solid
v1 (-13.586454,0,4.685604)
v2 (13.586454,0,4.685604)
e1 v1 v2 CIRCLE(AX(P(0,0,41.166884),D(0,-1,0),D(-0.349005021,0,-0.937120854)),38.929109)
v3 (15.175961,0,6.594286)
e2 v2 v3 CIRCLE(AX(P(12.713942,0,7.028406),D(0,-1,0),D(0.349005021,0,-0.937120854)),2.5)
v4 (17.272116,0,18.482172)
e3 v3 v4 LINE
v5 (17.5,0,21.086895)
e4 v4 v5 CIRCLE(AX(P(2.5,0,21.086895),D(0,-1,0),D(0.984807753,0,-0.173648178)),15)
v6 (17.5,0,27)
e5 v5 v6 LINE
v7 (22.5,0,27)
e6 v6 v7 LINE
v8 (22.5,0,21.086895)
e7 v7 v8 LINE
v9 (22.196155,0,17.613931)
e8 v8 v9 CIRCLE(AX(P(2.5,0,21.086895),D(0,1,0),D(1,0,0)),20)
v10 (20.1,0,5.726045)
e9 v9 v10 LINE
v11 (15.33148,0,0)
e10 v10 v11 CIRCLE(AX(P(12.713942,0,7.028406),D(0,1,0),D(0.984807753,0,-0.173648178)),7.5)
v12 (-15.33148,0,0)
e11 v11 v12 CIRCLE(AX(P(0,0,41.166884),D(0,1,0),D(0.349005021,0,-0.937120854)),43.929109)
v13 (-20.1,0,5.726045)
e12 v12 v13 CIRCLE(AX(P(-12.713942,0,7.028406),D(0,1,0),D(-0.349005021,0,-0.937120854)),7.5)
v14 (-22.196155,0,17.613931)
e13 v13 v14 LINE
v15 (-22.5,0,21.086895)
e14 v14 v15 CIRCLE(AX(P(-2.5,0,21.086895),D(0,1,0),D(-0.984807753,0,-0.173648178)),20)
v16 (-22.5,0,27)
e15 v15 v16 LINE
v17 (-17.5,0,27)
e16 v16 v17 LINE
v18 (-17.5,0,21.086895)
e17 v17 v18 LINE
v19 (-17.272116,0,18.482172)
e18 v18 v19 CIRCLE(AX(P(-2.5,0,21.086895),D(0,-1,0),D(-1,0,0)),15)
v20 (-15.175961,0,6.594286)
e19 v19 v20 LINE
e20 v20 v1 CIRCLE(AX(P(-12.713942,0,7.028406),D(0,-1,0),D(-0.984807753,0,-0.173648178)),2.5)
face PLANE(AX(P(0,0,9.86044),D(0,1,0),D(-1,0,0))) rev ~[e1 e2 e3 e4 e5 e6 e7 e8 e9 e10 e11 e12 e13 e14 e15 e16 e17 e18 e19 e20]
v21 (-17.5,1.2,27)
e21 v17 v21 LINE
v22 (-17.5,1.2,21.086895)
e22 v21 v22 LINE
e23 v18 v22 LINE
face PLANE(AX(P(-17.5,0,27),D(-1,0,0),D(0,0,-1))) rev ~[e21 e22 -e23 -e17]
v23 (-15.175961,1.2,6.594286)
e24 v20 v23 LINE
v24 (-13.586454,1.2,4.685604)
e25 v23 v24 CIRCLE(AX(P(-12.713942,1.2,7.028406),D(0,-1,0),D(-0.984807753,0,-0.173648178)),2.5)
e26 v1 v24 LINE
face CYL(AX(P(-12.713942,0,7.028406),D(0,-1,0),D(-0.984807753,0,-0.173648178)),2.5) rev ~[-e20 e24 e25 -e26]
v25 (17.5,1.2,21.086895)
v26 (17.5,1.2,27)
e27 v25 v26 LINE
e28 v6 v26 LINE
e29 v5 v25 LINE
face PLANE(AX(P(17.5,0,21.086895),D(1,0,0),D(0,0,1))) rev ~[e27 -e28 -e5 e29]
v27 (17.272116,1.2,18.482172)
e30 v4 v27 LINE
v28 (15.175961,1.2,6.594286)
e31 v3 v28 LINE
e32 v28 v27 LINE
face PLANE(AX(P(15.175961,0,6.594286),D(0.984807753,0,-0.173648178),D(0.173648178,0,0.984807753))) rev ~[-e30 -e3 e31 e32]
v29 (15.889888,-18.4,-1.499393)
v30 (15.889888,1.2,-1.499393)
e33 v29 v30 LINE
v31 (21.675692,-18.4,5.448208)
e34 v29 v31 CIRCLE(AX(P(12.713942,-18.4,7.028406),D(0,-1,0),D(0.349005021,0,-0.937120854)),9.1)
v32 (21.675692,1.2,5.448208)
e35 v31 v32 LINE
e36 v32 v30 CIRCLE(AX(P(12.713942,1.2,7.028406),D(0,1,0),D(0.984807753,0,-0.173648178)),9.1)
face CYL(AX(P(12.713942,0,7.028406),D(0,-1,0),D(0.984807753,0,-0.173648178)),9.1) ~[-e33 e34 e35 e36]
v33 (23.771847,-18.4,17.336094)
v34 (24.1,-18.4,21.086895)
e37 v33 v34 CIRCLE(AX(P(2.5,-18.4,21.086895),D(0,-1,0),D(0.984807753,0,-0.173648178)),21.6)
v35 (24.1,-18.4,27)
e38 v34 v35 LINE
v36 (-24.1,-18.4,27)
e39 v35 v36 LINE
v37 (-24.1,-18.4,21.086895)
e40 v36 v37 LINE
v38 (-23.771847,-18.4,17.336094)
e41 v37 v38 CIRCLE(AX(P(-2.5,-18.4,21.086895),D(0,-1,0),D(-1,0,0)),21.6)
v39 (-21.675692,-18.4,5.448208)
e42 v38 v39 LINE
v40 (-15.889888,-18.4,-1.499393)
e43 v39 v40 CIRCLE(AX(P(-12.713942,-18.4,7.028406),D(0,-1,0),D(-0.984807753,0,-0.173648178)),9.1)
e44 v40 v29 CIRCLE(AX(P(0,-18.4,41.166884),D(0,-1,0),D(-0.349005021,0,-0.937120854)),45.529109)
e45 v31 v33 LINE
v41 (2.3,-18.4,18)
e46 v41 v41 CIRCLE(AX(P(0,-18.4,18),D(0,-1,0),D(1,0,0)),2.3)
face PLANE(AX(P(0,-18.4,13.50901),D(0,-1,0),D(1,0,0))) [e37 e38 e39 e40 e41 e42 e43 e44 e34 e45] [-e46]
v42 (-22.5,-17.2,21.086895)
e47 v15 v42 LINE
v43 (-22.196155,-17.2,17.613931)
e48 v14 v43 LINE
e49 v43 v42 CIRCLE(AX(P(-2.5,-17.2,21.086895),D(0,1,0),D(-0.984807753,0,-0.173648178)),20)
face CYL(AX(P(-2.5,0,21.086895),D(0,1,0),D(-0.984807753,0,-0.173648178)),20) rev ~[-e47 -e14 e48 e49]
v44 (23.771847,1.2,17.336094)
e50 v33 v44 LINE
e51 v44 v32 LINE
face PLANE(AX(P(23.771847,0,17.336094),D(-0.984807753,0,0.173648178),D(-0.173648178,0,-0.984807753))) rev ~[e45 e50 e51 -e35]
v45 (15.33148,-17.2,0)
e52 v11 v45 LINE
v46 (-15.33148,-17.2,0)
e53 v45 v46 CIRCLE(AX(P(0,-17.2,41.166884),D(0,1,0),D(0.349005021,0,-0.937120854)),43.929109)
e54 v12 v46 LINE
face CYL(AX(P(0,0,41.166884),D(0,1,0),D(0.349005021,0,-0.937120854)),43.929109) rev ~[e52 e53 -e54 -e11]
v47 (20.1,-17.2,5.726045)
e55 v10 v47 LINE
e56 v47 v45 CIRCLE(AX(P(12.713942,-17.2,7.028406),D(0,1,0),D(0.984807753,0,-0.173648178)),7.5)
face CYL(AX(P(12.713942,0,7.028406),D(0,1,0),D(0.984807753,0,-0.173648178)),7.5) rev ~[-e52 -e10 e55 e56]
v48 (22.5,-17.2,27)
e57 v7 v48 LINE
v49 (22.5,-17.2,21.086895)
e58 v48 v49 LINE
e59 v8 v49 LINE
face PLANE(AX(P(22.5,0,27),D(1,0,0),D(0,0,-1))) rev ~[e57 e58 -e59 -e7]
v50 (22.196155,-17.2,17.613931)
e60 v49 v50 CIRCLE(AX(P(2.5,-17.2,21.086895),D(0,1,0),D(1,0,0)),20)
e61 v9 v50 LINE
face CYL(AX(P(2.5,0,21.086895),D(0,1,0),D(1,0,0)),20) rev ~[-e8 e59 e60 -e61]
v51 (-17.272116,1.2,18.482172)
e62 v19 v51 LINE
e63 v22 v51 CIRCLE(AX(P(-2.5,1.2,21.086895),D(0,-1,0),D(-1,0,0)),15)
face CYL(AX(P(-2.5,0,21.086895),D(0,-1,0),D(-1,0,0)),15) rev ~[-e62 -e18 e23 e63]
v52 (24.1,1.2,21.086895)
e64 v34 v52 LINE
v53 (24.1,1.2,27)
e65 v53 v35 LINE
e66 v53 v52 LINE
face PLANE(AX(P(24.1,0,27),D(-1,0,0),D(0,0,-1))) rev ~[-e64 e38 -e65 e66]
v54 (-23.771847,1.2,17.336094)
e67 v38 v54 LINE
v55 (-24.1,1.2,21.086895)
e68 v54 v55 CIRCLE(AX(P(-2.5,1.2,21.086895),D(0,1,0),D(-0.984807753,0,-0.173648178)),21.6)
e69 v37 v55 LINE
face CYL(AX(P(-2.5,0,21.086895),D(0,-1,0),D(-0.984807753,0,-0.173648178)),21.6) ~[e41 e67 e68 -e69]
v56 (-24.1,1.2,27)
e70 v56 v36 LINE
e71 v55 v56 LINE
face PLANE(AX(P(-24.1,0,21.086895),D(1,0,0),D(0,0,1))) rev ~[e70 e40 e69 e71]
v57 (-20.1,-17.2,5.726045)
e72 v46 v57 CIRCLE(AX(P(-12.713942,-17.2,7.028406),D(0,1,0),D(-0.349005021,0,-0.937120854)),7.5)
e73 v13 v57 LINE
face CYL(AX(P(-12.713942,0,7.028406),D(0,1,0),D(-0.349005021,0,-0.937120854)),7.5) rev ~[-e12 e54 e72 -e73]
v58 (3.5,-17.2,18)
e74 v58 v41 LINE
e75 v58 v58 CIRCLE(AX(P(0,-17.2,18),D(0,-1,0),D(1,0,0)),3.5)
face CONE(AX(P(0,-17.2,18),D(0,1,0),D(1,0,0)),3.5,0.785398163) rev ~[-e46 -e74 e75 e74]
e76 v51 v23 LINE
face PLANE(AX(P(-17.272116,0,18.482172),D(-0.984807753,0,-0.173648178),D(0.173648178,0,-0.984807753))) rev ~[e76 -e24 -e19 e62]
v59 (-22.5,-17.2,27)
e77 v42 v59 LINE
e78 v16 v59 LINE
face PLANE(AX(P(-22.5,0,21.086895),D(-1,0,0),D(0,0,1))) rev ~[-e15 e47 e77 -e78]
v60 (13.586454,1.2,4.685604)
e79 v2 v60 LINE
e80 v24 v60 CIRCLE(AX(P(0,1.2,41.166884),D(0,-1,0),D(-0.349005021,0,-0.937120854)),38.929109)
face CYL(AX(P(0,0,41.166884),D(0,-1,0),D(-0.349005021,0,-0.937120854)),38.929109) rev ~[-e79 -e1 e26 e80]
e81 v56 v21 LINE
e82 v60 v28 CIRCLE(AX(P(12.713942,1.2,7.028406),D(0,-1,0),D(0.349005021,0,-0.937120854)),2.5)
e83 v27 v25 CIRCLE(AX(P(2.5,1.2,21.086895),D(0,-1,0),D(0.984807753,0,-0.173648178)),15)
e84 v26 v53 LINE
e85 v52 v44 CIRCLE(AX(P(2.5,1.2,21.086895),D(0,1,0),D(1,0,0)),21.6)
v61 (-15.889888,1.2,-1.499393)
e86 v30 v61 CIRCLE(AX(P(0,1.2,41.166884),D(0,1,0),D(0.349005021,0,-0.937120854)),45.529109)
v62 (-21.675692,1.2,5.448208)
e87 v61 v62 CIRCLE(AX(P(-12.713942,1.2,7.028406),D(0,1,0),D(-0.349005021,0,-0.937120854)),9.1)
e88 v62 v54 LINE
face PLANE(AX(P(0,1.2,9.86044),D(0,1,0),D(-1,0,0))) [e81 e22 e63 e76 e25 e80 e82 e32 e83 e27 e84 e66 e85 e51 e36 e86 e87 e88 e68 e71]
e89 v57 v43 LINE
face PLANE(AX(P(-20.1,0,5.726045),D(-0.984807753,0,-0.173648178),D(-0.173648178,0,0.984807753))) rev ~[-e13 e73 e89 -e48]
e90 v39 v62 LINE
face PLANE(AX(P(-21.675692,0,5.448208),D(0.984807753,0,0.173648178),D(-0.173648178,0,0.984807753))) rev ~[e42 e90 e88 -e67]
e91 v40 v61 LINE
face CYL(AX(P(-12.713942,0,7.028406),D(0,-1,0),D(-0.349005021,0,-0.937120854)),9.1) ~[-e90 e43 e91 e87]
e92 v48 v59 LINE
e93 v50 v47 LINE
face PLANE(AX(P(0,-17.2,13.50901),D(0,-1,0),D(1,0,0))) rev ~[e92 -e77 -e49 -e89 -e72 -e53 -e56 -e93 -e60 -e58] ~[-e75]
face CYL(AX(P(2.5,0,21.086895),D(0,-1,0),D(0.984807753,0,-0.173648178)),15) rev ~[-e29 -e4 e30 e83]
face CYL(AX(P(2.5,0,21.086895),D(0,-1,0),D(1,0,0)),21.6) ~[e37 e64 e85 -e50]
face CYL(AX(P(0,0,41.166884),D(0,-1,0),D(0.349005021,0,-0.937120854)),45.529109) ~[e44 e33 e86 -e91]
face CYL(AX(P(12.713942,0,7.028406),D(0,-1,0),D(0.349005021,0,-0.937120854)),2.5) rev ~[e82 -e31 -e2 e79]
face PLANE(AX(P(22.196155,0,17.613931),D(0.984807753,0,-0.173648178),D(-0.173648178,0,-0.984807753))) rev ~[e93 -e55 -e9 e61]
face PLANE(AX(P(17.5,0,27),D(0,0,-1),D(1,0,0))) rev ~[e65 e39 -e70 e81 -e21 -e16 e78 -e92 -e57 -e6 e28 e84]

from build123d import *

# Parameters (mm, degrees)
F1_DEPTH = 17.2
F2_R     = 1.5
F3_DEPTH = 1.2
F5_DEPTH = 1.2


# Not quite as in the source:
# - a fillet or chamfer that OpenCascade refuses, or shapes differently, is made with other operations: its cross-section is extruded or revolved along the edge and cut away or added


with BuildPart() as f1:
    # F0 (on Front) → F1 (new body)
    with BuildSketch(Plane.XZ):
        with BuildLine():
            Line((-20.1, 5.7260450742), (-22.1961550602, 17.6139311585))
            ThreePointArc((-22.1961550602, 17.6139311585), (-22.4238939618, 19.3437798569), (-22.5, 21.0868947118))
            Line((-22.5, 21.0868947118), (-22.5, 27))
            Line((-22.5, 27), (-24.1, 27))
            Line((-24.1, 27), (-24.1, 21.0868947118))
            ThreePointArc((-24.1, 21.0868947118), (-24.0178054788, 19.2043306685), (-23.7718474651, 17.3360940742))
            Line((-23.7718474651, 17.3360940742), (-21.6756924048, 5.44820799))
            ThreePointArc((-21.6756924048, 5.44820799), (-19.7066672631, 1.205023255), (-15.889887542, -1.4993933668))
            ThreePointArc((-15.889887542, -1.4993933668), (0, -4.3622248316), (15.889887542, -1.4993933668))
            ThreePointArc((15.889887542, -1.4993933668), (19.7066672631, 1.205023255), (21.6756924048, 5.44820799))
            Line((21.6756924048, 5.44820799), (23.7718474651, 17.3360940742))
            ThreePointArc((23.7718474651, 17.3360940742), (24.0178054788, 19.2043306685), (24.1, 21.0868947118))
            Line((24.1, 21.0868947118), (24.1, 27))
            Line((24.1, 27), (22.5, 27))
            Line((22.5, 27), (22.5, 21.0868947118))
            ThreePointArc((22.5, 21.0868947118), (22.4238939618, 19.3437798569), (22.1961550602, 17.6139311585))
            Line((22.1961550602, 17.6139311585), (20.1, 5.7260450742))
            ThreePointArc((20.1, 5.7260450742), (18.477177081, 2.2289147982), (15.3314795087, 0))
            ThreePointArc((15.3314795087, 0), (0, -2.7622248316), (-15.3314795087, 0))
            ThreePointArc((-15.3314795087, 0), (-18.477177081, 2.2289147982), (-20.1, 5.7260450742))
        make_face()
    extrude(amount=F1_DEPTH)

    # F2 (on face) → F3 (join)
    with BuildSketch(Plane.XZ.offset(17.2)):
        with BuildLine():
            Line((24.1, 27), (-24.1, 27))
            Line((-24.1, 27), (-24.1, 21.0868947118))
            ThreePointArc((-24.1, 21.0868947118), (-24.0178054788, 19.2043306685), (-23.7718474651, 17.3360940742))
            Line((-23.7718474651, 17.3360940742), (-21.6756924048, 5.44820799))
            ThreePointArc((-21.6756924048, 5.44820799), (-19.7066672631, 1.205023255), (-15.889887542, -1.4993933668))
            ThreePointArc((-15.889887542, -1.4993933668), (0, -4.3622248316), (15.889887542, -1.4993933668))
            ThreePointArc((15.889887542, -1.4993933668), (19.7066672631, 1.205023255), (21.6756924048, 5.44820799))
            Line((21.6756924048, 5.44820799), (23.7718474651, 17.3360940742))
            ThreePointArc((23.7718474651, 17.3360940742), (24.0178054788, 19.2043306685), (24.1, 21.0868947118))
            Line((24.1, 21.0868947118), (24.1, 27))
        make_face()
        with Locations((0, 18)):
            Circle(F2_R, mode=Mode.SUBTRACT)
    extrude(amount=F3_DEPTH)

    # F4 (on face) → F5 (join)
    with BuildSketch(Plane(origin=(0, 0, 0), x_dir=(-1, 0, 0), z_dir=(0, 1, 0))):
        with BuildLine():
            Line((-24.1, 27), (-24.1, 21.0868947118))
            ThreePointArc((-24.1, 21.0868947118), (-24.0178054788, 19.2043306685), (-23.7718474651, 17.3360940742))
            Line((-23.7718474651, 17.3360940742), (-21.6756924048, 5.44820799))
            ThreePointArc((-21.6756924048, 5.44820799), (-19.7066672631, 1.205023255), (-15.889887542, -1.4993933668))
            ThreePointArc((-15.889887542, -1.4993933668), (0, -4.3622248316), (15.889887542, -1.4993933668))
            ThreePointArc((15.889887542, -1.4993933668), (19.7066672631, 1.205023255), (21.6756924048, 5.44820799))
            Line((21.6756924048, 5.44820799), (23.7718474651, 17.3360940742))
            ThreePointArc((23.7718474651, 17.3360940742), (24.0178054788, 19.2043306685), (24.1, 21.0868947118))
            Line((24.1, 21.0868947118), (24.1, 27))
            Line((24.1, 27), (17.5, 27))
            Line((17.5, 27), (17.5, 21.0868947118))
            ThreePointArc((17.5, 21.0868947118), (17.4429204714, 19.7795585706), (17.2721162952, 18.4821720468))
            Line((17.2721162952, 18.4821720468), (15.1759612349, 6.5942859626))
            ThreePointArc((15.1759612349, 6.5942859626), (14.6350202619, 5.4285758705), (13.5864544045, 4.6856042711))
            ThreePointArc((13.5864544045, 4.6856042711), (0, 2.2377751684), (-13.5864544045, 4.6856042711))
            ThreePointArc((-13.5864544045, 4.6856042711), (-14.6350202619, 5.4285758705), (-15.1759612349, 6.5942859626))
            Line((-15.1759612349, 6.5942859626), (-17.2721162952, 18.4821720468))
            ThreePointArc((-17.2721162952, 18.4821720468), (-17.4429204714, 19.7795585706), (-17.5, 21.0868947118))
            Line((-17.5, 21.0868947118), (-17.5, 27))
            Line((-17.5, 27), (-24.1, 27))
        make_face()
    extrude(amount=F5_DEPTH)

    # F6: chamfer of 2 on 1 edges, made by hand

    # F6_s1 → F6_t2 (revolve, cut)
    with BuildSketch(Plane.XY.offset(18)):
        Polygon((3.5, -17.2), (1.5, -19.2), (1.5, -17.2), align=None)
    revolve(axis=Axis((0, -17.2, 18), (0, -1, 0)), mode=Mode.SUBTRACT)


solid = f1.part
